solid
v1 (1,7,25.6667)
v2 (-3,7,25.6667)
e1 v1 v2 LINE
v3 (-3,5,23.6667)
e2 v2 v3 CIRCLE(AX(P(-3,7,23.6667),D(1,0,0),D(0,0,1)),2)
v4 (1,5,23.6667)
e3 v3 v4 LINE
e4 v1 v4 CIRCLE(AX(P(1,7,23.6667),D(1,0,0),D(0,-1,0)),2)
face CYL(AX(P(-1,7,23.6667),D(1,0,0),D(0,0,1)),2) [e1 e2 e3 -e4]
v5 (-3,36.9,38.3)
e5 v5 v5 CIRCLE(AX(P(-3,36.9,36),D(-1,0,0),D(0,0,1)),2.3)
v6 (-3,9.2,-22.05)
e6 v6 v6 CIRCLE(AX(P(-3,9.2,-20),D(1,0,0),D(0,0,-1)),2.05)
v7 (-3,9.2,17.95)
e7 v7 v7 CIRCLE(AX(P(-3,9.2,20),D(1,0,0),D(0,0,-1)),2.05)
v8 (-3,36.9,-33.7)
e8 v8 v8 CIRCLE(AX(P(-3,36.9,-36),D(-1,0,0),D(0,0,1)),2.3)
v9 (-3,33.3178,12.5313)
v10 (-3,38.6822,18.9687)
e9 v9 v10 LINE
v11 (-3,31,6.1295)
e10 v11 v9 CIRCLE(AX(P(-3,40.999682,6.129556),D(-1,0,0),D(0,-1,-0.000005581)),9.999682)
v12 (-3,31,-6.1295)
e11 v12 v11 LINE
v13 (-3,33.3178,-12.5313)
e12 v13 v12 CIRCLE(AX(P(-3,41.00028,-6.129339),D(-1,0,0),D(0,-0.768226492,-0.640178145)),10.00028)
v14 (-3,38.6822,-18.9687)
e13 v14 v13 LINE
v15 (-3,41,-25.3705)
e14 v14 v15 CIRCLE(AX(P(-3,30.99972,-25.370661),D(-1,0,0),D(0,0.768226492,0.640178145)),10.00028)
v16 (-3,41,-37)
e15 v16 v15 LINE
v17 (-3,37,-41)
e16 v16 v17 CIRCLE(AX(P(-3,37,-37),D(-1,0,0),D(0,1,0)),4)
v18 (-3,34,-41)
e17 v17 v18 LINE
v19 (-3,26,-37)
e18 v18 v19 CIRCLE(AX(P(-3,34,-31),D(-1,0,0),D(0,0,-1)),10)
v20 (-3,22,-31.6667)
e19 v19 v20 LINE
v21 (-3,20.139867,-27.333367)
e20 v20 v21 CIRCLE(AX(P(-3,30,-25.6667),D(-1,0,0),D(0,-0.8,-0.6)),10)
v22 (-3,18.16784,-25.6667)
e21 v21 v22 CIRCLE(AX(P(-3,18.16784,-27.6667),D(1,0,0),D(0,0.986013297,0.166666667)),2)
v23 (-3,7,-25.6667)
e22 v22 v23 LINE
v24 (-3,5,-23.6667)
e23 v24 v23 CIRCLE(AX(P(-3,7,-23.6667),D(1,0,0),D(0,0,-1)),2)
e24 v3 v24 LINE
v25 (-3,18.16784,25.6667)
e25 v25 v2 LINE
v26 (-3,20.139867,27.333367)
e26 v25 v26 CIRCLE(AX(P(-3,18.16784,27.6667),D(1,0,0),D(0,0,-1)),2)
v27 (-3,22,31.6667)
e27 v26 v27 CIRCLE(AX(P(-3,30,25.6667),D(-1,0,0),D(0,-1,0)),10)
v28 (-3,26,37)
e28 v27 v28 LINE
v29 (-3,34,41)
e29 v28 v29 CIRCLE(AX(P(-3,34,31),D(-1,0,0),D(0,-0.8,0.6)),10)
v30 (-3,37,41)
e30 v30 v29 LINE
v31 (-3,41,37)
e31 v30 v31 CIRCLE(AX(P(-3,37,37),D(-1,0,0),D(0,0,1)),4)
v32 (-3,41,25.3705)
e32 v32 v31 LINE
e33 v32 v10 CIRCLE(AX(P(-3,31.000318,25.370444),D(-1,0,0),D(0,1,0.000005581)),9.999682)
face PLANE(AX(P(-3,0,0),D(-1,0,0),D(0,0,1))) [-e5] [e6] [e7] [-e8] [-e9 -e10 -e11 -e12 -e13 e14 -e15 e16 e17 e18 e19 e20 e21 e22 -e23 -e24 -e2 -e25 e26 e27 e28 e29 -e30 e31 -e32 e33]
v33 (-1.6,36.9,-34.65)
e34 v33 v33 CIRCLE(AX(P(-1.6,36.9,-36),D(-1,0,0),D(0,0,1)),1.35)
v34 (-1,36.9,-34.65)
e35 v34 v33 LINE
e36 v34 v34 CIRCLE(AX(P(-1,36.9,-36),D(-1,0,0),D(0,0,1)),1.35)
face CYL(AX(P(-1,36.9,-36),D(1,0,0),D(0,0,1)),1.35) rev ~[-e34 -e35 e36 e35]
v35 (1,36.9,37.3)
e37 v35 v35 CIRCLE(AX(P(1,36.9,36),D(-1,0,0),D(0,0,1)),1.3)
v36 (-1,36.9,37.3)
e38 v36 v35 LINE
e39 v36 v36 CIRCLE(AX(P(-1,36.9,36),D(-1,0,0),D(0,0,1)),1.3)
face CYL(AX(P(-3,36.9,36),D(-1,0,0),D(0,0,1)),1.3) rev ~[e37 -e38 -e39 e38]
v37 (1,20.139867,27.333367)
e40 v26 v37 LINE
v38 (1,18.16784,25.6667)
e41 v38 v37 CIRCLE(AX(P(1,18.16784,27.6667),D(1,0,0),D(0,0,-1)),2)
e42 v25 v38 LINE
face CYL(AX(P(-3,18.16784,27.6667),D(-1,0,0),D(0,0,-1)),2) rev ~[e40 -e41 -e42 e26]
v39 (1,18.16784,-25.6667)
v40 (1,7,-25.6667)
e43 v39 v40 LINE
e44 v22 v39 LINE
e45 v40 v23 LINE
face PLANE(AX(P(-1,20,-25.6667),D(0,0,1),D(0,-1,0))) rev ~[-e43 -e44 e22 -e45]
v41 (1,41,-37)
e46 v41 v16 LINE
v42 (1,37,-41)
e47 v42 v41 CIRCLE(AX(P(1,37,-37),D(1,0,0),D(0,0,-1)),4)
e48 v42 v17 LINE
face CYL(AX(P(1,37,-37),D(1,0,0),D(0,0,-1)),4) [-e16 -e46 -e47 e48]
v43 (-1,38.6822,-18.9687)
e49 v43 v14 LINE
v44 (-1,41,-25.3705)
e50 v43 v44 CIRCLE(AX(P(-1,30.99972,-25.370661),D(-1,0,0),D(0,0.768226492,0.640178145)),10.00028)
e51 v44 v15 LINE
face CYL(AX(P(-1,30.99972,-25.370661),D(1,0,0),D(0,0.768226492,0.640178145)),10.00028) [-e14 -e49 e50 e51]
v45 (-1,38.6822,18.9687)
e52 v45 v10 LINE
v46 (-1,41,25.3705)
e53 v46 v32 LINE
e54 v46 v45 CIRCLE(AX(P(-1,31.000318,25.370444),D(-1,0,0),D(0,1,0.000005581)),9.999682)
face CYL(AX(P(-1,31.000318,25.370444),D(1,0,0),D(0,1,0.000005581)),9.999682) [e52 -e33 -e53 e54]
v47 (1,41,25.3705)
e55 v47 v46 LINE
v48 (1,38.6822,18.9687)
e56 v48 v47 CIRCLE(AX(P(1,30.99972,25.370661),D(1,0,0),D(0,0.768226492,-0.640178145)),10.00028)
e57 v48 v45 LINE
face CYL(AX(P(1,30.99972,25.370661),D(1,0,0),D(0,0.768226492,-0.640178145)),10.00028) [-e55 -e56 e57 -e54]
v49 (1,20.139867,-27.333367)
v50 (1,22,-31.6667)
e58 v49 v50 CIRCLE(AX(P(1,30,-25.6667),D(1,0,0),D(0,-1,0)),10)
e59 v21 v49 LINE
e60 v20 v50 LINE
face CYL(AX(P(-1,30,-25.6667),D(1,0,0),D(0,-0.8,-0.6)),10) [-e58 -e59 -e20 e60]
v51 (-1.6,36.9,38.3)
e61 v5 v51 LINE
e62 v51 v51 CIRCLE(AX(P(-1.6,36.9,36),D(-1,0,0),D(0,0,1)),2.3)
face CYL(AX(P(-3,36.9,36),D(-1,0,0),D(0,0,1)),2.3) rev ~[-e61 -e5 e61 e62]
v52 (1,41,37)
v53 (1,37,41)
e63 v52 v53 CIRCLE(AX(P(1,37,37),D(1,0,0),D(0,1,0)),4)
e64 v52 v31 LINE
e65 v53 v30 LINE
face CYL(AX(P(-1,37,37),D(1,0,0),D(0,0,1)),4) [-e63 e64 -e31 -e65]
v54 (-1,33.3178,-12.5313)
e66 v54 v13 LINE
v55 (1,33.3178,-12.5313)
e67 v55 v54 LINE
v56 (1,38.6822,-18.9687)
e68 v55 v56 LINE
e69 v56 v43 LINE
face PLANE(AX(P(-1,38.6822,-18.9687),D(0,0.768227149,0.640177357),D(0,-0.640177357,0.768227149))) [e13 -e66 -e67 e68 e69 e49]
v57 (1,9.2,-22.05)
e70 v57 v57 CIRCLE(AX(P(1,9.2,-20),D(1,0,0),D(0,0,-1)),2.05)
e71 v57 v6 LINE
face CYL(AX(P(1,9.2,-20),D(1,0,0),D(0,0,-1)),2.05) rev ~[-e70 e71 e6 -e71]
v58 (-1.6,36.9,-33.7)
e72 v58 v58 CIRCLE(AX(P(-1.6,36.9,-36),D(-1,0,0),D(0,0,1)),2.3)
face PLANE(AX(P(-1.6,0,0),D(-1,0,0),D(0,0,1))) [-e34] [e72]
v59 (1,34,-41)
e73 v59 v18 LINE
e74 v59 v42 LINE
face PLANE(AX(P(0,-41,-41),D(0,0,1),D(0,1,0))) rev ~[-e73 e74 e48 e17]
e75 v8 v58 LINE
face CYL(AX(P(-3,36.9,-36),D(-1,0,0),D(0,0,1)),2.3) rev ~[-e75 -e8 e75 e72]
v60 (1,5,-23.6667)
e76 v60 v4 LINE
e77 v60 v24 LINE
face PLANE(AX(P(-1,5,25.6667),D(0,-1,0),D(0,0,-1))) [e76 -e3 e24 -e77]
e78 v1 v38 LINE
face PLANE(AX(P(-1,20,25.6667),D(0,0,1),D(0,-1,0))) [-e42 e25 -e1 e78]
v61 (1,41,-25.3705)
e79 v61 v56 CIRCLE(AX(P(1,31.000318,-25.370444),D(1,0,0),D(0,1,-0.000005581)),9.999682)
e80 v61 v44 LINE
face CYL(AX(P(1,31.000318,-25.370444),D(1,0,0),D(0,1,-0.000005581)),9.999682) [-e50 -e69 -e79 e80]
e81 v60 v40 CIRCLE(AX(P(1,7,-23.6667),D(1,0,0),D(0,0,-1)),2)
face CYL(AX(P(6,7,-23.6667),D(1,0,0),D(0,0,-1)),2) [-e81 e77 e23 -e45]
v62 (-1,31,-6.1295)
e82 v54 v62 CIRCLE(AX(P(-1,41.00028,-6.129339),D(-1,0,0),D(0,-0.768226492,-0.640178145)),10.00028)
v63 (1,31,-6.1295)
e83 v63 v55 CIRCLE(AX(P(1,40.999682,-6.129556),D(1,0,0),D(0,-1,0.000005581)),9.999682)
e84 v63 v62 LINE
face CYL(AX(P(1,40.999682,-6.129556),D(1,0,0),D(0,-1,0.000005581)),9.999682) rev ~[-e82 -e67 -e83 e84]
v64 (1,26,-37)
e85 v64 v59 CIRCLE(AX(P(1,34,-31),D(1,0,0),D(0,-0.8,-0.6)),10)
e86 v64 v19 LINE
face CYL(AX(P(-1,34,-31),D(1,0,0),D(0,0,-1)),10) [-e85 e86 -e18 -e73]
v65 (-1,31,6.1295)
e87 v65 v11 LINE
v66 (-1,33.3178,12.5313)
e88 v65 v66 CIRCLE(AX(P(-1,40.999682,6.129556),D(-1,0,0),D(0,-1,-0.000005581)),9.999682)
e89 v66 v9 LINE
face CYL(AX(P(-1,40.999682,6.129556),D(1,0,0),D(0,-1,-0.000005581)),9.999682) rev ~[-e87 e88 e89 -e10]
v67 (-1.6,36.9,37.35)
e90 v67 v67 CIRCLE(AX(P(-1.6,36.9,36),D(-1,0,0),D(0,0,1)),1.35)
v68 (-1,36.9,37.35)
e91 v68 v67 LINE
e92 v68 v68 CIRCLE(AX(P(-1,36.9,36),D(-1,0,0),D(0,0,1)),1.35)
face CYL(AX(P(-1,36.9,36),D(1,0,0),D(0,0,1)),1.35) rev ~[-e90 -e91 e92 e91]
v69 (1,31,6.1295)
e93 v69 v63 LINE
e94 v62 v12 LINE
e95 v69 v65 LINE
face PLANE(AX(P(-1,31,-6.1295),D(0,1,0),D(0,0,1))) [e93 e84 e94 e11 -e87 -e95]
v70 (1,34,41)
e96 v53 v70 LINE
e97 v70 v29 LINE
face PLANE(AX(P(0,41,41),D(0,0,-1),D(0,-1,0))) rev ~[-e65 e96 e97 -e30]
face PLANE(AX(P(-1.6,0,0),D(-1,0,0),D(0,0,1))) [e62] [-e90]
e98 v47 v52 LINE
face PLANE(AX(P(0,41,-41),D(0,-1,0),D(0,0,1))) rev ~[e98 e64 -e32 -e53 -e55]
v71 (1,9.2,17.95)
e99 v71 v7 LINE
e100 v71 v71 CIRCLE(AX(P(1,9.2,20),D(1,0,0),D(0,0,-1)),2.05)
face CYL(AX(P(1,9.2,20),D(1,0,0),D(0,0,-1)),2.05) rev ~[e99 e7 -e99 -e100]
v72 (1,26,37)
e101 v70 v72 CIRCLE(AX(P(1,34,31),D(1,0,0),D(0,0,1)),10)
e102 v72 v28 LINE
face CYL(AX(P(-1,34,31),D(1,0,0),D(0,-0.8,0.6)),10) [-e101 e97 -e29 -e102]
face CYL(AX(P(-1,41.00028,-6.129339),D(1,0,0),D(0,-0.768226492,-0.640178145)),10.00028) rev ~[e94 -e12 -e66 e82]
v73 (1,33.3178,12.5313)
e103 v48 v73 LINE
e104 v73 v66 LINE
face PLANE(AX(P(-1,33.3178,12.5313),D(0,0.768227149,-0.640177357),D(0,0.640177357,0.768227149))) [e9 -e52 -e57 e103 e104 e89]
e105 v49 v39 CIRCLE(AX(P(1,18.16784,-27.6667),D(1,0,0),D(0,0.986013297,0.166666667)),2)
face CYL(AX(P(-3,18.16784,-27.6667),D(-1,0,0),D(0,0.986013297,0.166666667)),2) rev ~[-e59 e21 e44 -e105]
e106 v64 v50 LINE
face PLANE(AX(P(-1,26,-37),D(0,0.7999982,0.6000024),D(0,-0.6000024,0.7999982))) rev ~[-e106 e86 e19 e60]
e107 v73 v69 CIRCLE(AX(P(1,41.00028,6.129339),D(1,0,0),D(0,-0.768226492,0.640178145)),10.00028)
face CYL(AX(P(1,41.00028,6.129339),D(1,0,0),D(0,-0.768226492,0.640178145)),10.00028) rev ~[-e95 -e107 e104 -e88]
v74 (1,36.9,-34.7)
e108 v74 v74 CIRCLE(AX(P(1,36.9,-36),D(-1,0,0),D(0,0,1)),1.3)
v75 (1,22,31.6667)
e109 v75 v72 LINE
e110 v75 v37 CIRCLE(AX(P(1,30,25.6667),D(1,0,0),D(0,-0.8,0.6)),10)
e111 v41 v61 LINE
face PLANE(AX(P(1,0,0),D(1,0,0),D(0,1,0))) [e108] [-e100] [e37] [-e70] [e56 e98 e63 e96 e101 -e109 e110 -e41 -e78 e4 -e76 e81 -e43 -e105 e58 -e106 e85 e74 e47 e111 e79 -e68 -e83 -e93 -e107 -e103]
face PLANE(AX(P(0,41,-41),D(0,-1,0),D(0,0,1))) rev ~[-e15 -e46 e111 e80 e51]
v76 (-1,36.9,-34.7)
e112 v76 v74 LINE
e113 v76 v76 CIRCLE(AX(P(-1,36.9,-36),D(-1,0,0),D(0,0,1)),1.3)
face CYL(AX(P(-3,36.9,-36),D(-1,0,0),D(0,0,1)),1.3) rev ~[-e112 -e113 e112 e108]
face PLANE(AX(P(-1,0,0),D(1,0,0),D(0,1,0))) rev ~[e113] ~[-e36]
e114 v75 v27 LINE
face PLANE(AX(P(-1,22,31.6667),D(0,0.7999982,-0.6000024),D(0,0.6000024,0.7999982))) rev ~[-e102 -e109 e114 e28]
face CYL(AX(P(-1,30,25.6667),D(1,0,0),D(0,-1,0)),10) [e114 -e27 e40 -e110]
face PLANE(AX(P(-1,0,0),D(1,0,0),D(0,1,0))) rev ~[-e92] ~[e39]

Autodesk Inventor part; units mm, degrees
ref_plane "YZ Plane" through (0, 0, 0) normal (1, 0, 0) x (0, 1, 0)
ref_plane "XZ Plane" through (0, 0, 0) normal (0, 1, 0) x (-1, 0, 0)
ref_plane "XY Plane" through (0, 0, 0) normal (0, 0, 1) x (1, 0, 0)
sketch "Sketch1" plane through (0, 0, 0) normal (1, 0, 0) x (0, 1, 0)
  line L0 (41, 41) -> (-41, 41)
  line L1 (-41, 41) -> (-41, -41)
  line L2 (-41, -41) -> (41, -41)
  line L3 (41, -41) -> (41, 41)
  point P0 (0, 0)
  point P1 (0, 41)
  point P2 (41, 0)
  dimension "d0" = 82
  dimension "d1" = 82
extrude "Extrusion1" add sketch "Sketch1" along normal mid plane 2
sketch "Sketch2" plane through (-1, 0, 0) normal (-1, 0, 0) x (0, 0, 1)
  line L0 (31.6667, 22) -> (37, 26) projected
  arc A0 (25.6667, 20) -> (31.6667, 22) centre (25.6667, 30) ccw projected
  line L1 (17.5, 20) -> (25.6667, 20) projected
  line L2 (17.5, 20) -> (17.5, 18.2355) projected
  line L3 (-17.5, 18.2356) -> (17.5, 18.2356) projected
  line L4 (-17.5, 20) -> (-17.5, 18.2355) projected
  line L5 (-25.6667, 20) -> (-17.5, 20) projected
  arc A1 (-31.6667, 22) -> (-25.6667, 20) centre (-25.6667, 30) ccw projected
  line L6 (-37, 26) -> (-31.6667, 22) projected
  arc A2 (-41, 34) -> (-37, 26) centre (-31, 34) ccw projected
  line L7 (-41, 37) -> (-41, 34) projected
  arc A3 (-37, 41) -> (-41, 37) centre (-37, 37) ccw projected
  line L8 (-37, 41) -> (-25.3705, 41) projected
  arc A4 (-18.9687, 38.6822) -> (-25.3705, 41) centre (-25.3705, 31) ccw projected
  line L9 (-18.9687, 38.6822) -> (-12.5313, 33.3178) projected
  arc A5 (-12.5313, 33.3178) -> (-6.1295, 31) centre (-6.1295, 41) ccw projected
  line L10 (-6.1295, 31) -> (6.1295, 31) projected
  arc A6 (6.1295, 31) -> (12.5313, 33.3178) centre (6.1295, 41) ccw projected
  line L11 (12.5313, 33.3178) -> (18.9687, 38.6822) projected
  arc A7 (25.3705, 41) -> (18.9687, 38.6822) centre (25.3705, 31) ccw projected
  line L12 (25.3705, 41) -> (37, 41) projected
  arc A8 (41, 37) -> (37, 41) centre (37, 37) ccw projected
  line L13 (41, 37) -> (41, 34) projected
  arc A9 (37, 26) -> (41, 34) centre (31, 34) ccw projected
  circle A10 centre (36, 36.9) radius 1.35 projected
  circle A11 centre (-36, 36.9) radius 1.35 projected
  line L14 (-25.6667, 20) -> (-25.6667, 5)
  line L15 (25.6667, 20) -> (25.6667, 5)
  line L16 (25.6667, 5) -> (-25.6667, 5)
  point P0 (0, 0)
  dimension "d4" = 15
extrude "Extrusion2" add sketch "Sketch2" along normal blind 2
sketch "Sketch3" plane through (1, 0, 0) normal (1, 0, 0) x (0, 0, -1)
  line L0 (-31.6667, 22) -> (-37, 26) projected
  arc A0 (-41, 34) -> (-37, 26) centre (-31, 34) ccw projected
  line L1 (-41, 34) -> (-41, 37) projected
  arc A1 (-37, 41) -> (-41, 37) centre (-37, 37) ccw projected
  line L2 (-37, 41) -> (-25.3705, 41) projected
  arc A2 (-18.9687, 38.6822) -> (-25.3705, 41) centre (-25.3705, 31) ccw projected
  line L3 (-18.9687, 38.6822) -> (-12.5313, 33.3178) projected
  arc A3 (-12.5313, 33.3178) -> (-6.1295, 31) centre (-6.1295, 41) ccw projected
  line L4 (-6.1295, 31) -> (6.1295, 31) projected
  arc A4 (6.1295, 31) -> (12.5313, 33.3178) centre (6.1295, 41) ccw projected
  line L5 (12.5313, 33.3178) -> (18.9687, 38.6822) projected
  arc A5 (25.3705, 41) -> (18.9687, 38.6822) centre (25.3705, 31) ccw projected
  line L6 (25.3705, 41) -> (37, 41) projected
  arc A6 (41, 37) -> (37, 41) centre (37, 37) ccw projected
  line L7 (41, 37) -> (41, 34) projected
  arc A7 (37, 26) -> (41, 34) centre (31, 34) ccw projected
  line L8 (37, 26) -> (31.6667, 22) projected
  arc A8 (25.6667, 20) -> (31.6667, 22) centre (25.6667, 30) ccw projected
  line L9 (25.6667, 20) -> (25.6667, 5) projected
  line L10 (25.6667, 5) -> (-25.6667, 5) projected
  line L11 (-25.6667, 5) -> (-25.6667, 20) projected
  arc A9 (-31.6667, 22) -> (-25.6667, 20) centre (-25.6667, 30) ccw projected
  circle A10 centre (-36, 36.9) radius 1.35 projected
  circle A11 centre (36, 36.9) radius 1.35 projected
  line L12 (-41, -41) -> (41, -41) projected
  line L13 (41, -41) -> (41, 41) projected
  line L14 (41, 41) -> (-41, 41) projected
  line L15 (-41, 41) -> (-41, -41) projected
  point P0 (0, 0)
  point P1 (41, 37)
  point P2 (-37, 41)
  point P3 (25.3705, 41)
  point P4 (-41, 34)
extrude "Extrusion3" cut sketch "Sketch3" against normal blind 15 contours A9 L11 L10 L9 A8 L8 A7 L13 L12 L15 A0 L0 | L15 L14 A1 | L14 A5 L5 A4 L4 A3 L3 A2 | A6 L14 L13
sketch "Sketch4" plane through (-3, 0, 0) normal (-1, 0, 0) x (0, 0, 1)
  line L0 (31.6667, 22) -> (37, 26) projected
  arc A0 (37, 26) -> (41, 34) centre (31, 34) ccw projected
  line L1 (41, 34) -> (41, 37) projected
  arc A1 (41, 37) -> (37, 41) centre (37, 37) ccw projected
  line L2 (37, 41) -> (25.3705, 41) projected
  arc A2 (25.3705, 41) -> (18.9687, 38.6822) centre (25.3705, 31) ccw projected
  line L3 (18.9687, 38.6822) -> (12.5313, 33.3178) projected
  arc A3 (6.1295, 31) -> (12.5313, 33.3178) centre (6.1295, 41) ccw projected
  line L4 (6.1295, 31) -> (-6.1295, 31) projected
  arc A4 (-12.5313, 33.3178) -> (-6.1295, 31) centre (-6.1295, 41) ccw projected
  line L5 (-12.5313, 33.3178) -> (-18.9687, 38.6822) projected
  arc A5 (-18.9687, 38.6822) -> (-25.3705, 41) centre (-25.3705, 31) ccw projected
  line L6 (-25.3705, 41) -> (-37, 41) projected
  arc A6 (-37, 41) -> (-41, 37) centre (-37, 37) ccw projected
  line L7 (-41, 37) -> (-41, 34) projected
  arc A7 (-41, 34) -> (-37, 26) centre (-31, 34) ccw projected
  line L8 (-37, 26) -> (-31.6667, 22) projected
  arc A8 (-31.6667, 22) -> (-25.6667, 20) centre (-25.6667, 30) ccw projected
  line L9 (-25.6667, 20) -> (-25.6667, 5) projected
  line L10 (-25.6667, 5) -> (25.6667, 5) projected
  line L11 (25.6667, 5) -> (25.6667, 20) projected
  arc A9 (25.6667, 20) -> (31.6667, 22) centre (25.6667, 30) ccw projected
  circle A10 centre (36, 36.9) radius 1.35 projected
  circle A11 centre (-36, 36.9) radius 1.35 projected
  circle A12 centre (-36, 36.9) radius 2.3
  circle A13 centre (36, 36.9) radius 2.3
  point P0 (0, 0)
  dimension "d9" = 4.6
  dimension "d10" = 4.6
extrude "Extrusion4" cut sketch "Sketch4" against normal blind 1.4 contours A12 | A13
sketch "Sketch5" plane through (-3, 0, 0) normal (-1, 0, 0) x (0, 0, 1)
  circle A0 centre (36, 36.9) radius 2.3 projected
  circle A1 centre (-36, 36.9) radius 2.3 projected
  line L0 (31.6667, 22) -> (37, 26) projected
  arc A2 (37, 26) -> (41, 34) centre (31, 34) ccw projected
  line L1 (41, 34) -> (41, 37) projected
  arc A3 (41, 37) -> (37, 41) centre (37, 37) ccw projected
  line L2 (37, 41) -> (25.3705, 41) projected
  arc A4 (25.3705, 41) -> (18.9687, 38.6822) centre (25.3705, 31) ccw projected
  line L3 (18.9687, 38.6822) -> (12.5313, 33.3178) projected
  arc A5 (6.1295, 31) -> (12.5313, 33.3178) centre (6.1295, 41) ccw projected
  line L4 (6.1295, 31) -> (-6.1295, 31) projected
  arc A6 (-12.5313, 33.3178) -> (-6.1295, 31) centre (-6.1295, 41) ccw projected
  line L5 (-12.5313, 33.3178) -> (-18.9687, 38.6822) projected
  arc A7 (-18.9687, 38.6822) -> (-25.3705, 41) centre (-25.3705, 31) ccw projected
  line L6 (-25.3705, 41) -> (-37, 41) projected
  arc A8 (-37, 41) -> (-41, 37) centre (-37, 37) ccw projected
  line L7 (-41, 37) -> (-41, 34) projected
  arc A9 (-41, 34) -> (-37, 26) centre (-31, 34) ccw projected
  line L8 (-37, 26) -> (-31.6667, 22) projected
  arc A10 (-31.6667, 22) -> (-25.6667, 20) centre (-25.6667, 30) ccw projected
  line L9 (-25.6667, 20) -> (-25.6667, 5) projected
  line L10 (-25.6667, 5) -> (25.6667, 5) projected
  line L11 (25.6667, 5) -> (25.6667, 20) projected
  arc A11 (25.6667, 20) -> (31.6667, 22) centre (25.6667, 30) ccw projected
  circle A12 centre (-36, 36.9) radius 1.3
  circle A13 centre (36, 36.9) radius 1.3
  point P0 (0, 0)
  dimension "d13" = 2.6
  dimension "d14" = 2.6
extrude "Extrusion5" cut sketch "Sketch5" against normal through all contours A12 | A13
sketch "Sketch6" plane through (1, 0, 0) normal (1, 0, 0) x (0, 0, -1)
  arc A0 (-37, 41) -> (-41, 37) centre (-37, 37) ccw projected
  line L0 (-41, 37) -> (-41, 34) projected
  arc A1 (-41, 34) -> (-37, 26) centre (-31, 34) ccw projected
  line L1 (-37, 26) -> (-31.6667, 22) projected
  arc A2 (-31.6667, 22) -> (-25.6667, 20) centre (-25.6667, 30) ccw projected
  line L2 (-25.6667, 20) -> (-25.6667, 5) projected
  line L3 (-25.6667, 5) -> (25.6667, 5) projected
  line L4 (25.6667, 5) -> (25.6667, 20) projected
  arc A3 (25.6667, 20) -> (31.6667, 22) centre (25.6667, 30) ccw projected
  line L5 (31.6667, 22) -> (37, 26) projected
  arc A4 (37, 26) -> (41, 34) centre (31, 34) ccw projected
  line L6 (41, 34) -> (41, 37) projected
  arc A5 (41, 37) -> (37, 41) centre (37, 37) ccw projected
  line L7 (37, 41) -> (25.3705, 41) projected
  arc A6 (25.3705, 41) -> (18.9687, 38.6822) centre (25.3705, 31) ccw projected
  line L8 (18.9687, 38.6822) -> (12.5313, 33.3178) projected
  arc A7 (6.1295, 31) -> (12.5313, 33.3178) centre (6.1295, 41) ccw projected
  line L9 (6.1295, 31) -> (-6.1295, 31) projected
  arc A8 (-12.5313, 33.3178) -> (-6.1295, 31) centre (-6.1295, 41) ccw projected
  line L10 (-12.5313, 33.3178) -> (-18.9687, 38.6822) projected
  arc A9 (-18.9687, 38.6822) -> (-25.3705, 41) centre (-25.3705, 31) ccw projected
  line L11 (-25.3705, 41) -> (-37, 41) projected
  circle A10 centre (-20, 9.2) radius 2.05
  circle A11 centre (20, 9.2) radius 2.05
  line L12 (-20, 9.2) -> (20, 9.2) construction
  point P0 (0, 0)
  point P1 (0, 31)
  point P2 (0, 9.2)
  dimension "d17" = 4.1
  dimension "d18" = 4.1
  dimension "d19" = 4.2
  dimension "d20" = 40
extrude "Extrusion6" cut sketch "Sketch6" against normal blind 10 contours A10 | A11
fillet "Fillet1" radius 2 4 edges at (-1, 20, -25.6667) (-1, 5, -25.6667) (-1, 5, 25.6667) (-1, 20, 25.6667)
properties part number "Camera_mount"
